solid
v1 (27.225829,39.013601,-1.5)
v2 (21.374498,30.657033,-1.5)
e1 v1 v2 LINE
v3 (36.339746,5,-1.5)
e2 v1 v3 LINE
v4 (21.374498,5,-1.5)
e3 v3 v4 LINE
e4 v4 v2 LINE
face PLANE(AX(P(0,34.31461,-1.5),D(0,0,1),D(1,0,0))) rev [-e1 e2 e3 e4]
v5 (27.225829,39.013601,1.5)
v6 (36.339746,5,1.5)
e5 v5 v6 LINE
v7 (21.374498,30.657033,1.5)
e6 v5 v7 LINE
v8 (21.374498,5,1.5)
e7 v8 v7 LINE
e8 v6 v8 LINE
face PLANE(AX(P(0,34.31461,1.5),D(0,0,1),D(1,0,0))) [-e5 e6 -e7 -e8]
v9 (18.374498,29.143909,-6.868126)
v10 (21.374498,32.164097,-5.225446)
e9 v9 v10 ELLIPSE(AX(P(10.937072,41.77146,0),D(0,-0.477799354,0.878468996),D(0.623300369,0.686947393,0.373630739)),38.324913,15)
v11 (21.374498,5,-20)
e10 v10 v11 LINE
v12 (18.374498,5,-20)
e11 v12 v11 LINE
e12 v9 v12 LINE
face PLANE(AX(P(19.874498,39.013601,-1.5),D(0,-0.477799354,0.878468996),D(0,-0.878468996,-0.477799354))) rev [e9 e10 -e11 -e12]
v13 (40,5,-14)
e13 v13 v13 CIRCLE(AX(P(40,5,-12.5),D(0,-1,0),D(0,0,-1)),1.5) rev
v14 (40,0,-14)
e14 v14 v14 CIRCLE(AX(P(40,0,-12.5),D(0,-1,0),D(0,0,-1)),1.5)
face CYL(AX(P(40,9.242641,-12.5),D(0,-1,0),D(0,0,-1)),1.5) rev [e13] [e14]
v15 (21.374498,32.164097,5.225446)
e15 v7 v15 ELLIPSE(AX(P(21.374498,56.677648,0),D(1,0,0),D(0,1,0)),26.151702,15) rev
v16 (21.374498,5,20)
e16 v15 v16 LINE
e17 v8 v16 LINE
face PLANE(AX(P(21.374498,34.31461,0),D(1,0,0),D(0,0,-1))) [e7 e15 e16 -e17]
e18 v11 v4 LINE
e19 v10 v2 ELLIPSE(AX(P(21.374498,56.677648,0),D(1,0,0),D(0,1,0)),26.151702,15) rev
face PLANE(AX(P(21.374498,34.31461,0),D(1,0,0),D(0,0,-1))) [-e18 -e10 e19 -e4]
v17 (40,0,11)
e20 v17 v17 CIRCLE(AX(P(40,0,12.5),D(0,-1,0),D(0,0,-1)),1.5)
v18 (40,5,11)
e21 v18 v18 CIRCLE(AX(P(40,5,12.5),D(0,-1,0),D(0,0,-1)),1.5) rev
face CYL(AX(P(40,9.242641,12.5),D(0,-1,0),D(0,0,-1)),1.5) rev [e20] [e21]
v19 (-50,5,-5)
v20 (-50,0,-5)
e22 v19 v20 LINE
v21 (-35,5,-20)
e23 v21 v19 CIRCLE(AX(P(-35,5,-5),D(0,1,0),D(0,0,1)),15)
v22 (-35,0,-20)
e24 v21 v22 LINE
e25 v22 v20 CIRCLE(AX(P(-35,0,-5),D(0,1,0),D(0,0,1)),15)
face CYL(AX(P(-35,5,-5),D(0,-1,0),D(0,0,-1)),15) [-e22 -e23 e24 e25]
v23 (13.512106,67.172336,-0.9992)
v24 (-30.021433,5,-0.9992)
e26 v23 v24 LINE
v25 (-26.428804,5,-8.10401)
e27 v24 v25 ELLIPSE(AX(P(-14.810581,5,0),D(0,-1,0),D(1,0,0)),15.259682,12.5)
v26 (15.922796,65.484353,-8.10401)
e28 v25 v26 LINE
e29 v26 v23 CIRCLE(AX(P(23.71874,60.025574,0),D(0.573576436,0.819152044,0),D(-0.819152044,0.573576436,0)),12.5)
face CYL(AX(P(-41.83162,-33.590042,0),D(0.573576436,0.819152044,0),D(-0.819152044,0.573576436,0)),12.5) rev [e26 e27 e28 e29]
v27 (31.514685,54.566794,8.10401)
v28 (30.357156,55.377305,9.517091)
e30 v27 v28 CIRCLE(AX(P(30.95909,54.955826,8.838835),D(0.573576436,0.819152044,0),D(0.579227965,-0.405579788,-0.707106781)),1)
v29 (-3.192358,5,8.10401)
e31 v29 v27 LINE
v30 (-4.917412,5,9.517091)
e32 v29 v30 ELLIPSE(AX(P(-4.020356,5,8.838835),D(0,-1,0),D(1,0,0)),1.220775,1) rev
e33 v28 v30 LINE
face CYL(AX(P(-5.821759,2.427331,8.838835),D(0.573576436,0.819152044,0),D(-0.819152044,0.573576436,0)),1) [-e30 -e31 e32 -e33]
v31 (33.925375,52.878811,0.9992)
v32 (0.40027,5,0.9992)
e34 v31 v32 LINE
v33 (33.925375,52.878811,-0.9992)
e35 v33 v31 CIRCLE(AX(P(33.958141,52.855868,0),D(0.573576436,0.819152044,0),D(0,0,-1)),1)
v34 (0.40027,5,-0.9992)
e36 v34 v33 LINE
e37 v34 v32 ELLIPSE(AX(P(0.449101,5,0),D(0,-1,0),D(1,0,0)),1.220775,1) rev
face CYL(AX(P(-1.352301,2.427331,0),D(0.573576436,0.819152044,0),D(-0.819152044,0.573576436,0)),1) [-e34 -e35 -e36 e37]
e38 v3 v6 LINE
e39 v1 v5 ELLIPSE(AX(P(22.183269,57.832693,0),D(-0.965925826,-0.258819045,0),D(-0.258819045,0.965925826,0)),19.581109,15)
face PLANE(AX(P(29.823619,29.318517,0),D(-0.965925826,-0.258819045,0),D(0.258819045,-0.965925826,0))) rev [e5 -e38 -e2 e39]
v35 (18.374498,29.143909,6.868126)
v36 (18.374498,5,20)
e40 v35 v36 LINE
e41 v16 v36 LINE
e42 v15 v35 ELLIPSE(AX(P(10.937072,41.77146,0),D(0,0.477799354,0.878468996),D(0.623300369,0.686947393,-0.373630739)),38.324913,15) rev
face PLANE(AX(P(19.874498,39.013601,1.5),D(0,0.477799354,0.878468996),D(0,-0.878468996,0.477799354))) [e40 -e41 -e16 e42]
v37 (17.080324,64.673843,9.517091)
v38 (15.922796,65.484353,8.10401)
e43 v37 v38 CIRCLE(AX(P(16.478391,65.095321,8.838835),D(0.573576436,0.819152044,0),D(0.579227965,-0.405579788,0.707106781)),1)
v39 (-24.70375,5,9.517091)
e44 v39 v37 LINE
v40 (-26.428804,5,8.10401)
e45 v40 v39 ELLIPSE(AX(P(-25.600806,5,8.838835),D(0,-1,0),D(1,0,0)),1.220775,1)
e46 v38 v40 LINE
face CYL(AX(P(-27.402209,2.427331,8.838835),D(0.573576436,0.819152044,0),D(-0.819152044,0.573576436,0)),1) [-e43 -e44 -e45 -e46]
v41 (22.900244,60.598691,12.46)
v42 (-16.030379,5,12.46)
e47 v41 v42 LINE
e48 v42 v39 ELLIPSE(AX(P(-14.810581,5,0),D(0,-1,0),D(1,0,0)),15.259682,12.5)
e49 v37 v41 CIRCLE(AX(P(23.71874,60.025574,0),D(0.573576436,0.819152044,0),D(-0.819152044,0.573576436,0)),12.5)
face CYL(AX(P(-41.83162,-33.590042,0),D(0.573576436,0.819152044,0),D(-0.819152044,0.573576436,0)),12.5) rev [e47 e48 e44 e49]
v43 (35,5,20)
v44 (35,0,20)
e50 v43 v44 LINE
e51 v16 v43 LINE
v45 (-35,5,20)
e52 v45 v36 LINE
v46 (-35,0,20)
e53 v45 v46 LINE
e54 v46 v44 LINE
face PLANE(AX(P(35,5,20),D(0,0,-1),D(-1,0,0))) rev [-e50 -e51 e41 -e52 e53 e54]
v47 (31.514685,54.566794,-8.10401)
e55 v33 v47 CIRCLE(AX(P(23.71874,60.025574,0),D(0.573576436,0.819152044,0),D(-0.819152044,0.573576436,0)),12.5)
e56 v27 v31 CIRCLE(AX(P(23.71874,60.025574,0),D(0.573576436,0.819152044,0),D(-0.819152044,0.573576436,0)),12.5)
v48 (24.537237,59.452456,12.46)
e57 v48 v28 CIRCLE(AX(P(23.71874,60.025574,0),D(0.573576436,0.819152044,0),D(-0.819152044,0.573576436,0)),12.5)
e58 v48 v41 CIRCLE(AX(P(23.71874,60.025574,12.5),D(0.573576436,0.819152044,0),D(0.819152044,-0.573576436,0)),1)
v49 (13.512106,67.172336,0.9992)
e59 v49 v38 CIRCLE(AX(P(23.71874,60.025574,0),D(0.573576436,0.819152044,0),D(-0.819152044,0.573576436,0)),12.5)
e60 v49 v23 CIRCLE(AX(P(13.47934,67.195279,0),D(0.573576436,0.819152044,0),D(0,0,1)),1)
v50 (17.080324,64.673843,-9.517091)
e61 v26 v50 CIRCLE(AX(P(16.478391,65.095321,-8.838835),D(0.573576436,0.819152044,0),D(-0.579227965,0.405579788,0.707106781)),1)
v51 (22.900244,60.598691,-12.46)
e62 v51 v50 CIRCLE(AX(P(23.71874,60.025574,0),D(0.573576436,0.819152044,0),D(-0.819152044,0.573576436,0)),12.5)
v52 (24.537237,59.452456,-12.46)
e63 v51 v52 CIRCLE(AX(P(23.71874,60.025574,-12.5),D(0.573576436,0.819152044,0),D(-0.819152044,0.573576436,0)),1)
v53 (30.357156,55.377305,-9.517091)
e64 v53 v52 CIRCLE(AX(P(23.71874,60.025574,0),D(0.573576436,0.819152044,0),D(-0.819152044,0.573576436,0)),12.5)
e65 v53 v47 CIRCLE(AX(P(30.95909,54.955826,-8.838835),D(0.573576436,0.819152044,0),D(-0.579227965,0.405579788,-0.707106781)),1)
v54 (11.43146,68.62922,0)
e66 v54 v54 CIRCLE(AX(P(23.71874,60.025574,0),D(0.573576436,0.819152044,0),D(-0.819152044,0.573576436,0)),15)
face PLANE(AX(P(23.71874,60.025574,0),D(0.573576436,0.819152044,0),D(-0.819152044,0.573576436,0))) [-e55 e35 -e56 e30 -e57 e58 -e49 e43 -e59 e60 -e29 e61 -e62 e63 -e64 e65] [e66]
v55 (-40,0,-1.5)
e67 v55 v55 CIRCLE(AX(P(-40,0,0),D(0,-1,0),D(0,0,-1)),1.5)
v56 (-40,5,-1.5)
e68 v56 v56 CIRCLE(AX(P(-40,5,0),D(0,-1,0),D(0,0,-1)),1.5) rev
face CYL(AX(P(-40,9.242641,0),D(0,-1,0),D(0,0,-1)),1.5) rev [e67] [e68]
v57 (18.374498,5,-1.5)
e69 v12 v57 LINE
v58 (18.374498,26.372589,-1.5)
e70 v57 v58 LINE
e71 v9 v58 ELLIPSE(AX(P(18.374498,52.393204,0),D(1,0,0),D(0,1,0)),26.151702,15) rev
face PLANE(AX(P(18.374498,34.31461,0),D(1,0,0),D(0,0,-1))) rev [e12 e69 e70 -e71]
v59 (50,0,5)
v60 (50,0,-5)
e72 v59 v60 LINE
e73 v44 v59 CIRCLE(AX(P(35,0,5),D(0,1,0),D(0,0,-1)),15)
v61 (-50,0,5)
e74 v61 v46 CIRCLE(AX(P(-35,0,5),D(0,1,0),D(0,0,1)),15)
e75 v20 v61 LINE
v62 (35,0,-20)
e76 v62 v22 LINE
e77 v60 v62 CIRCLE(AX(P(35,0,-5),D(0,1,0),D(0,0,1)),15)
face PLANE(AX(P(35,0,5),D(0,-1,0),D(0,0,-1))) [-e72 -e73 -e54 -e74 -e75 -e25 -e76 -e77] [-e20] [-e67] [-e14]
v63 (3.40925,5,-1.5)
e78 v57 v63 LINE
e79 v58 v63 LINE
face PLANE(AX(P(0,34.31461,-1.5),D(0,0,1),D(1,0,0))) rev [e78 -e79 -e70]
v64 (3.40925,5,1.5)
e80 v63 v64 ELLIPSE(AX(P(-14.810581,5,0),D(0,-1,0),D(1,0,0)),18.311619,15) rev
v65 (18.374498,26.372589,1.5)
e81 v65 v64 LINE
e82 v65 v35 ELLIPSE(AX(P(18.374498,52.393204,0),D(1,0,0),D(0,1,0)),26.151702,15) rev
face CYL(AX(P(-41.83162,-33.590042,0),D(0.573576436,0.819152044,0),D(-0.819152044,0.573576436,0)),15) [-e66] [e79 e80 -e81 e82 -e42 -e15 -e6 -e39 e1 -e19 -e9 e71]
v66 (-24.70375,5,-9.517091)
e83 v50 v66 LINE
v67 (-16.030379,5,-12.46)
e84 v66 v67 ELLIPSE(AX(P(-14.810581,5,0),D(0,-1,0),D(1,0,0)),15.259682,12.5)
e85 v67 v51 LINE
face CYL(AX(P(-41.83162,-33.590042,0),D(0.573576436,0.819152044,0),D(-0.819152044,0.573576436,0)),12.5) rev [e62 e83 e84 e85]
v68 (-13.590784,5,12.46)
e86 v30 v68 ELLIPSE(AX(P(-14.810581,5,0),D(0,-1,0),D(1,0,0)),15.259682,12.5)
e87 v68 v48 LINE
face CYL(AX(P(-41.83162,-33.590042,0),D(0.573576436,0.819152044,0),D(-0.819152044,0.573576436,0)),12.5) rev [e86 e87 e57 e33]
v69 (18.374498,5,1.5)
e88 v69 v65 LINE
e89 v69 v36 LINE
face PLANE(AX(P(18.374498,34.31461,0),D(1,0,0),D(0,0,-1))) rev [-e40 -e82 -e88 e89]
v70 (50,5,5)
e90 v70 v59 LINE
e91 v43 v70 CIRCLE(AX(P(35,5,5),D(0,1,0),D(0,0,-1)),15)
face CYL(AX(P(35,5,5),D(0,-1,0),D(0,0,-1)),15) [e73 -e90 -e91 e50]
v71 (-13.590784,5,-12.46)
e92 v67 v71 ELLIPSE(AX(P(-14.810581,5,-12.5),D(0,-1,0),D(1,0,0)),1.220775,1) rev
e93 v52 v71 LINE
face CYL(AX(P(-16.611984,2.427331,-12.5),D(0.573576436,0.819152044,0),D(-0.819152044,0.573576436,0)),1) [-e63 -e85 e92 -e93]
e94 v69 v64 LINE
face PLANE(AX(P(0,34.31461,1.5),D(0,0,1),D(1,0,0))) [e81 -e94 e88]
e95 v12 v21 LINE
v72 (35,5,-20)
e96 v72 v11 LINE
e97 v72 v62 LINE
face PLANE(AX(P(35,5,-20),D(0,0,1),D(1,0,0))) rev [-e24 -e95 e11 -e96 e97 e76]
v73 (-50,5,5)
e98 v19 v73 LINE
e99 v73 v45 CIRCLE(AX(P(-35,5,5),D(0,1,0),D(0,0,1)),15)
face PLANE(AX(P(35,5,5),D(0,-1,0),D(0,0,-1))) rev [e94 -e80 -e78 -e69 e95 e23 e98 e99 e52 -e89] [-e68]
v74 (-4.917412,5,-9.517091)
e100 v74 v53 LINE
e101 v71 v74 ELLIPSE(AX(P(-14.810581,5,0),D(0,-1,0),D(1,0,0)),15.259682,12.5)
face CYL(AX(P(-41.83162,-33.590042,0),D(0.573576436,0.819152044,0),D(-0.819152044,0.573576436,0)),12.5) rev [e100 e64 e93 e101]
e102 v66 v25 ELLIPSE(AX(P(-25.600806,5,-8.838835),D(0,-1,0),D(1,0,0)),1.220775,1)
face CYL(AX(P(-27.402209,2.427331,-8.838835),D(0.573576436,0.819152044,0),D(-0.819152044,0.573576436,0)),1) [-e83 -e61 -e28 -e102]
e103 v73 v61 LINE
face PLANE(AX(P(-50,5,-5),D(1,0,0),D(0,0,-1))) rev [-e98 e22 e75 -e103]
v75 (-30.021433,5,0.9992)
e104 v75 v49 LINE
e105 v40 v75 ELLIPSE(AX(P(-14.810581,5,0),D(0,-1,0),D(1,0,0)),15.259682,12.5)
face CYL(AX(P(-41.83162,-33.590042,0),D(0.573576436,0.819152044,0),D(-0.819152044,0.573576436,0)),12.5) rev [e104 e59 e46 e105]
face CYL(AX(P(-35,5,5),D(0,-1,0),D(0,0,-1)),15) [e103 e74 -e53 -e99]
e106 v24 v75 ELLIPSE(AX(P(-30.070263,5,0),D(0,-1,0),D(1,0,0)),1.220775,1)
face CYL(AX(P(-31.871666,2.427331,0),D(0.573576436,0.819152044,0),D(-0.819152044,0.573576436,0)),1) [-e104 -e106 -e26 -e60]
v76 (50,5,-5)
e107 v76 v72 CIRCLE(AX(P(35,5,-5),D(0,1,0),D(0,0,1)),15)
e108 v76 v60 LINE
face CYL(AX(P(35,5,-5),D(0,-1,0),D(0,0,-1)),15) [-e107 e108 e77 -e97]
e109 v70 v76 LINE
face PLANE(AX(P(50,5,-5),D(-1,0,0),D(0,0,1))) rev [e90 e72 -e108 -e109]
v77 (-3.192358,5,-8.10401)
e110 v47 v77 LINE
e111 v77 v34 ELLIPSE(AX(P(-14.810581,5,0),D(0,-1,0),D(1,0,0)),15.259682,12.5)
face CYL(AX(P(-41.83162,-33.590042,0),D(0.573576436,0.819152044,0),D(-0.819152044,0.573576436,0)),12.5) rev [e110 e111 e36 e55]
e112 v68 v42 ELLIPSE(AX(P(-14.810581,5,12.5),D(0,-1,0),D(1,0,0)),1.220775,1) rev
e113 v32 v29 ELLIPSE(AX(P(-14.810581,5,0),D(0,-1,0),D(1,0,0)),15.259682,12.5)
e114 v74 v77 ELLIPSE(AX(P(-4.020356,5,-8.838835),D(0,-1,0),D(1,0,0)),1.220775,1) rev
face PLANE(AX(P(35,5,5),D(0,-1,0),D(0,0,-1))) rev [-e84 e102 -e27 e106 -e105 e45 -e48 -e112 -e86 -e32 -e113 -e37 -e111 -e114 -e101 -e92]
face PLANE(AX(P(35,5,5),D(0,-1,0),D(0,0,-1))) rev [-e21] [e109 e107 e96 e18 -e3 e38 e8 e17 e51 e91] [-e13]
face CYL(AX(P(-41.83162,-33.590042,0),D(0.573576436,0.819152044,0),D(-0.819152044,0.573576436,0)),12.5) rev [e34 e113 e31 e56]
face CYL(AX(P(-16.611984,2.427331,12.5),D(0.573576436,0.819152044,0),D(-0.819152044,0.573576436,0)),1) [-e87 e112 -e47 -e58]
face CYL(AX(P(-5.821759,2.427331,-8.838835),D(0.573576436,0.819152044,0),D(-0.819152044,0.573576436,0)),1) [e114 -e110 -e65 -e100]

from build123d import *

# Parameters (mm, degrees)
BOSS_EXTRUDE1_DEPTH = 5
BOSS_EXTRUDE2_REACH = 104.182
SKETCH3_R           = 15
SKETCH3_R_2         = 12.5
BOSS_EXTRUDE3_REACH = 104.182
SKETCH4_R           = 1
CIRPATTERN1_START   = 1.089571064
CIRPATTERN1_DEPTH   = 61.685010975
CIRPATTERN1_START_2 = -13.151834357
CIRPATTERN1_2_DEPTH = 16.804980917
CIRPATTERN1_START_3 = -6.049458183
CIRPATTERN1_3_DEPTH = 9.702604743
RIB2_REACH          = 89.235
SKETCH5_WALL_W      = 196.470282612
SKETCH5_WALL_H      = 3
RIB3_REACH          = 101.962
SKETCH6_WALL_W      = 240.643320444
SKETCH6_WALL_H      = 3
SKETCH7_R           = 1.5
CUT_EXTRUDE1_DEPTH  = 5


with BuildPart() as part:
    # Sketch2 → Boss-Extrude1 (new body)
    with BuildSketch(Plane(origin=(0, 0, 0), x_dir=(1, 0, 0), z_dir=(0, 1, 0))):
        with BuildLine():
            Line((35, 20), (-35, 20))
            ThreePointArc((-35, 20), (-45.606601718, 15.606601718), (-50, 5))
            Line((-50, 5), (-50, -5))
            ThreePointArc((-50, -5), (-45.606601718, -15.606601718), (-35, -20))
            Line((-35, -20), (35, -20))
            ThreePointArc((35, -20), (45.606601718, -15.606601718), (50, -5))
            Line((50, -5), (50, 5))
            ThreePointArc((50, 5), (45.606601718, 15.606601718), (35, 20))
        make_face()
    extrude(amount=BOSS_EXTRUDE1_DEPTH)

    # Boss-Extrude2: up to this plane
    boss_extrude2_end = Plane(origin=(35, 5, 5), z_dir=(0, -1, 0))
    # Sketch3 → Boss-Extrude2 (add, up to the surface)
    with BuildSketch(Plane(origin=(36.006021059, 51.421927207, 0), x_dir=(0, 0, -1), z_dir=(0.5735764363510473, 0.819152044288991, 0)), mode=Mode.PRIVATE) as boss_extrude2_sk1:
        with Locations(Location((0, 15, 0), (0, 0, 90))):
            Circle(SKETCH3_R)
        with Locations(Location((0, 15, 0), (0, 0, 90))):
            Circle(SKETCH3_R_2, mode=Mode.SUBTRACT)
    boss_extrude2_tool1 = split(extrude(boss_extrude2_sk1.sketch, amount=-BOSS_EXTRUDE2_REACH, mode=Mode.PRIVATE), bisect_by=boss_extrude2_end, keep=Keep.BOTH, mode=Mode.PRIVATE)
    add(boss_extrude2_tool1.solids().sort_by_distance((35.658484, 51.665275, 0))[0])

    # Boss-Extrude3: up to this plane
    boss_extrude3_end = Plane(origin=(35, 5, 5), z_dir=(0, -1, 0))
    # Sketch4 → Boss-Extrude3 (add, up to the surface)
    with BuildSketch(Plane(origin=(36.006021059, 51.421927207, 0), x_dir=(0.819152044288991, -0.5735764363510474, 0), z_dir=(0.5735764363510474, 0.819152044288991, 0)), mode=Mode.PRIVATE) as boss_extrude3_sk1:
        with Locations((-15, 12.5)):
            Circle(SKETCH4_R)
    boss_extrude3_tool1 = split(extrude(boss_extrude3_sk1.sketch, amount=-BOSS_EXTRUDE3_REACH, mode=Mode.PRIVATE), bisect_by=boss_extrude3_end, keep=Keep.BOTH, mode=Mode.PRIVATE)
    add(boss_extrude3_tool1.solids().sort_by_distance((23.71874, 60.025574, -12.5))[0])

    # CirPattern1: read off the stored shape, not the designer's step
    # CirPattern1 outline → CirPattern1 (add)
    with BuildSketch(Plane(origin=(0, 0, 0), x_dir=(0.819152044288991, -0.5735764363510472, 0), z_dir=(0.5735764363510472, 0.8191520442889911, 0)).offset(CIRPATTERN1_START)):
        with BuildLine():
            ThreePointArc((-5.482908637, 8.104009624), (-6.161165235, 8.838834765), (-6.895990376, 9.517091363))
            ThreePointArc((-6.895990376, 9.517091363), (-6.868272016, 8.131727984), (-5.482908637, 8.104009624))
        make_face()
        with BuildLine():
            ThreePointArc((-23.104009624, 9.517091363), (-23.838834765, 8.838834765), (-24.517091363, 8.104009624))
            ThreePointArc((-24.517091363, 8.104009624), (-23.131727984, 8.131727984), (-23.104009624, 9.517091363))
        make_face()
        with BuildLine():
            ThreePointArc((-27.46, 0.99919968), (-27.5, 0), (-27.46, -0.99919968))
            ThreePointArc((-27.46, -0.99919968), (-26.5, 0), (-27.46, 0.99919968))
        make_face()
        with BuildLine():
            ThreePointArc((-24.517091363, -8.104009624), (-23.838834765, -8.838834765), (-23.104009624, -9.517091363))
            ThreePointArc((-23.104009624, -9.517091363), (-23.131727984, -8.131727984), (-24.517091363, -8.104009624))
        make_face()
        with BuildLine():
            ThreePointArc((-15.99919968, -12.46), (-15, -12.5), (-14.00080032, -12.46))
            ThreePointArc((-14.00080032, -12.46), (-15, -11.5), (-15.99919968, -12.46))
        make_face()
        with BuildLine():
            ThreePointArc((-6.895990376, -9.517091363), (-6.161165235, -8.838834765), (-5.482908637, -8.104009624))
            ThreePointArc((-5.482908637, -8.104009624), (-6.868272016, -8.131727984), (-6.895990376, -9.517091363))
        make_face()
        with BuildLine():
            ThreePointArc((-2.54, -0.99919968), (-2.5, 0), (-2.54, 0.99919968))
            ThreePointArc((-2.54, 0.99919968), (-3.5, 0), (-2.54, -0.99919968))
        make_face()
    extrude(amount=CIRPATTERN1_DEPTH)

    # CirPattern1 2 outline → CirPattern1 2 (add)
    with BuildSketch(Plane(origin=(0, 0, 0), x_dir=(0.819152044288991, -0.5735764363510472, 0), z_dir=(0.5735764363510472, 0.8191520442889911, 0)).offset(CIRPATTERN1_START_2)):
        with BuildLine():
            ThreePointArc((-23.104009624, 9.517091363), (-23.838834765, 8.838834765), (-24.517091363, 8.104009624))
            ThreePointArc((-24.517091363, 8.104009624), (-23.131727984, 8.131727984), (-23.104009624, 9.517091363))
        make_face()
        with BuildLine():
            ThreePointArc((-27.46, 0.99919968), (-27.5, 0), (-27.46, -0.99919968))
            ThreePointArc((-27.46, -0.99919968), (-26.5, 0), (-27.46, 0.99919968))
        make_face()
        with BuildLine():
            ThreePointArc((-24.517091363, -8.104009624), (-23.838834765, -8.838834765), (-23.104009624, -9.517091363))
            ThreePointArc((-23.104009624, -9.517091363), (-23.131727984, -8.131727984), (-24.517091363, -8.104009624))
        make_face()
    extrude(amount=CIRPATTERN1_2_DEPTH)

    # CirPattern1 3 outline → CirPattern1 3 (add)
    with BuildSketch(Plane(origin=(0, 0, 0), x_dir=(0.819152044288991, -0.5735764363510472, 0), z_dir=(0.5735764363510472, 0.8191520442889911, 0)).offset(CIRPATTERN1_START_3)):
        with BuildLine():
            ThreePointArc((-15.99919968, -12.46), (-15, -12.5), (-14.00080032, -12.46))
            ThreePointArc((-14.00080032, -12.46), (-15, -11.5), (-15.99919968, -12.46))
        make_face()
    extrude(amount=CIRPATTERN1_3_DEPTH)

    # Sketch5 wall → Rib2 (add, up to next)
    with BuildSketch(Plane(origin=(32.411809549, 19.659258263, 0), x_dir=(0.258819045097, -0.96592582629, 0), z_dir=(0.96592582629, 0.258819045097, 0)), mode=Mode.PRIVATE) as rib2_sk1:
        Rectangle(SKETCH5_WALL_W, SKETCH5_WALL_H)
    rib2_tool1 = extrude(rib2_sk1.sketch, amount=-RIB2_REACH, mode=Mode.PRIVATE) - part.part
    add(rib2_tool1.solids().sort_by_distance((32.411809549, 19.659258263, 0))[0])

    # Sketch6 wall → Rib3 (add, up to next)
    with BuildSketch(Plane(origin=(19.874497756, 22.00680033, 10.75), x_dir=(0, -0.878468996126, 0.47779935417), z_dir=(0, -0.47779935417, -0.878468996126)), mode=Mode.PRIVATE) as rib3_sk1:
        Rectangle(SKETCH6_WALL_W, SKETCH6_WALL_H)
    rib3_tool1 = extrude(rib3_sk1.sketch, amount=RIB3_REACH, mode=Mode.PRIVATE) - part.part
    rib3 = rib3_tool1.solids().sort_by_distance((19.874497756, 22.00680033, 10.75))[0]
    add(rib3)

    # Mirror1: Rib3 across plane
    add(rib3.mirror(Plane.XY))

    # Sketch7 → Cut-Extrude1 (cut)
    with BuildSketch(Plane.XZ):
        with Locations(Location((-40, 0, 0), (0, 0, 270))):
            Circle(SKETCH7_R)
        with Locations(Location((40, -12.5, 0), (0, 0, 270))):
            Circle(SKETCH7_R)
        with Locations(Location((40, 12.5, 0), (0, 0, 270))):
            Circle(SKETCH7_R)
    extrude(amount=-CUT_EXTRUDE1_DEPTH, mode=Mode.SUBTRACT)


solid = part.part
